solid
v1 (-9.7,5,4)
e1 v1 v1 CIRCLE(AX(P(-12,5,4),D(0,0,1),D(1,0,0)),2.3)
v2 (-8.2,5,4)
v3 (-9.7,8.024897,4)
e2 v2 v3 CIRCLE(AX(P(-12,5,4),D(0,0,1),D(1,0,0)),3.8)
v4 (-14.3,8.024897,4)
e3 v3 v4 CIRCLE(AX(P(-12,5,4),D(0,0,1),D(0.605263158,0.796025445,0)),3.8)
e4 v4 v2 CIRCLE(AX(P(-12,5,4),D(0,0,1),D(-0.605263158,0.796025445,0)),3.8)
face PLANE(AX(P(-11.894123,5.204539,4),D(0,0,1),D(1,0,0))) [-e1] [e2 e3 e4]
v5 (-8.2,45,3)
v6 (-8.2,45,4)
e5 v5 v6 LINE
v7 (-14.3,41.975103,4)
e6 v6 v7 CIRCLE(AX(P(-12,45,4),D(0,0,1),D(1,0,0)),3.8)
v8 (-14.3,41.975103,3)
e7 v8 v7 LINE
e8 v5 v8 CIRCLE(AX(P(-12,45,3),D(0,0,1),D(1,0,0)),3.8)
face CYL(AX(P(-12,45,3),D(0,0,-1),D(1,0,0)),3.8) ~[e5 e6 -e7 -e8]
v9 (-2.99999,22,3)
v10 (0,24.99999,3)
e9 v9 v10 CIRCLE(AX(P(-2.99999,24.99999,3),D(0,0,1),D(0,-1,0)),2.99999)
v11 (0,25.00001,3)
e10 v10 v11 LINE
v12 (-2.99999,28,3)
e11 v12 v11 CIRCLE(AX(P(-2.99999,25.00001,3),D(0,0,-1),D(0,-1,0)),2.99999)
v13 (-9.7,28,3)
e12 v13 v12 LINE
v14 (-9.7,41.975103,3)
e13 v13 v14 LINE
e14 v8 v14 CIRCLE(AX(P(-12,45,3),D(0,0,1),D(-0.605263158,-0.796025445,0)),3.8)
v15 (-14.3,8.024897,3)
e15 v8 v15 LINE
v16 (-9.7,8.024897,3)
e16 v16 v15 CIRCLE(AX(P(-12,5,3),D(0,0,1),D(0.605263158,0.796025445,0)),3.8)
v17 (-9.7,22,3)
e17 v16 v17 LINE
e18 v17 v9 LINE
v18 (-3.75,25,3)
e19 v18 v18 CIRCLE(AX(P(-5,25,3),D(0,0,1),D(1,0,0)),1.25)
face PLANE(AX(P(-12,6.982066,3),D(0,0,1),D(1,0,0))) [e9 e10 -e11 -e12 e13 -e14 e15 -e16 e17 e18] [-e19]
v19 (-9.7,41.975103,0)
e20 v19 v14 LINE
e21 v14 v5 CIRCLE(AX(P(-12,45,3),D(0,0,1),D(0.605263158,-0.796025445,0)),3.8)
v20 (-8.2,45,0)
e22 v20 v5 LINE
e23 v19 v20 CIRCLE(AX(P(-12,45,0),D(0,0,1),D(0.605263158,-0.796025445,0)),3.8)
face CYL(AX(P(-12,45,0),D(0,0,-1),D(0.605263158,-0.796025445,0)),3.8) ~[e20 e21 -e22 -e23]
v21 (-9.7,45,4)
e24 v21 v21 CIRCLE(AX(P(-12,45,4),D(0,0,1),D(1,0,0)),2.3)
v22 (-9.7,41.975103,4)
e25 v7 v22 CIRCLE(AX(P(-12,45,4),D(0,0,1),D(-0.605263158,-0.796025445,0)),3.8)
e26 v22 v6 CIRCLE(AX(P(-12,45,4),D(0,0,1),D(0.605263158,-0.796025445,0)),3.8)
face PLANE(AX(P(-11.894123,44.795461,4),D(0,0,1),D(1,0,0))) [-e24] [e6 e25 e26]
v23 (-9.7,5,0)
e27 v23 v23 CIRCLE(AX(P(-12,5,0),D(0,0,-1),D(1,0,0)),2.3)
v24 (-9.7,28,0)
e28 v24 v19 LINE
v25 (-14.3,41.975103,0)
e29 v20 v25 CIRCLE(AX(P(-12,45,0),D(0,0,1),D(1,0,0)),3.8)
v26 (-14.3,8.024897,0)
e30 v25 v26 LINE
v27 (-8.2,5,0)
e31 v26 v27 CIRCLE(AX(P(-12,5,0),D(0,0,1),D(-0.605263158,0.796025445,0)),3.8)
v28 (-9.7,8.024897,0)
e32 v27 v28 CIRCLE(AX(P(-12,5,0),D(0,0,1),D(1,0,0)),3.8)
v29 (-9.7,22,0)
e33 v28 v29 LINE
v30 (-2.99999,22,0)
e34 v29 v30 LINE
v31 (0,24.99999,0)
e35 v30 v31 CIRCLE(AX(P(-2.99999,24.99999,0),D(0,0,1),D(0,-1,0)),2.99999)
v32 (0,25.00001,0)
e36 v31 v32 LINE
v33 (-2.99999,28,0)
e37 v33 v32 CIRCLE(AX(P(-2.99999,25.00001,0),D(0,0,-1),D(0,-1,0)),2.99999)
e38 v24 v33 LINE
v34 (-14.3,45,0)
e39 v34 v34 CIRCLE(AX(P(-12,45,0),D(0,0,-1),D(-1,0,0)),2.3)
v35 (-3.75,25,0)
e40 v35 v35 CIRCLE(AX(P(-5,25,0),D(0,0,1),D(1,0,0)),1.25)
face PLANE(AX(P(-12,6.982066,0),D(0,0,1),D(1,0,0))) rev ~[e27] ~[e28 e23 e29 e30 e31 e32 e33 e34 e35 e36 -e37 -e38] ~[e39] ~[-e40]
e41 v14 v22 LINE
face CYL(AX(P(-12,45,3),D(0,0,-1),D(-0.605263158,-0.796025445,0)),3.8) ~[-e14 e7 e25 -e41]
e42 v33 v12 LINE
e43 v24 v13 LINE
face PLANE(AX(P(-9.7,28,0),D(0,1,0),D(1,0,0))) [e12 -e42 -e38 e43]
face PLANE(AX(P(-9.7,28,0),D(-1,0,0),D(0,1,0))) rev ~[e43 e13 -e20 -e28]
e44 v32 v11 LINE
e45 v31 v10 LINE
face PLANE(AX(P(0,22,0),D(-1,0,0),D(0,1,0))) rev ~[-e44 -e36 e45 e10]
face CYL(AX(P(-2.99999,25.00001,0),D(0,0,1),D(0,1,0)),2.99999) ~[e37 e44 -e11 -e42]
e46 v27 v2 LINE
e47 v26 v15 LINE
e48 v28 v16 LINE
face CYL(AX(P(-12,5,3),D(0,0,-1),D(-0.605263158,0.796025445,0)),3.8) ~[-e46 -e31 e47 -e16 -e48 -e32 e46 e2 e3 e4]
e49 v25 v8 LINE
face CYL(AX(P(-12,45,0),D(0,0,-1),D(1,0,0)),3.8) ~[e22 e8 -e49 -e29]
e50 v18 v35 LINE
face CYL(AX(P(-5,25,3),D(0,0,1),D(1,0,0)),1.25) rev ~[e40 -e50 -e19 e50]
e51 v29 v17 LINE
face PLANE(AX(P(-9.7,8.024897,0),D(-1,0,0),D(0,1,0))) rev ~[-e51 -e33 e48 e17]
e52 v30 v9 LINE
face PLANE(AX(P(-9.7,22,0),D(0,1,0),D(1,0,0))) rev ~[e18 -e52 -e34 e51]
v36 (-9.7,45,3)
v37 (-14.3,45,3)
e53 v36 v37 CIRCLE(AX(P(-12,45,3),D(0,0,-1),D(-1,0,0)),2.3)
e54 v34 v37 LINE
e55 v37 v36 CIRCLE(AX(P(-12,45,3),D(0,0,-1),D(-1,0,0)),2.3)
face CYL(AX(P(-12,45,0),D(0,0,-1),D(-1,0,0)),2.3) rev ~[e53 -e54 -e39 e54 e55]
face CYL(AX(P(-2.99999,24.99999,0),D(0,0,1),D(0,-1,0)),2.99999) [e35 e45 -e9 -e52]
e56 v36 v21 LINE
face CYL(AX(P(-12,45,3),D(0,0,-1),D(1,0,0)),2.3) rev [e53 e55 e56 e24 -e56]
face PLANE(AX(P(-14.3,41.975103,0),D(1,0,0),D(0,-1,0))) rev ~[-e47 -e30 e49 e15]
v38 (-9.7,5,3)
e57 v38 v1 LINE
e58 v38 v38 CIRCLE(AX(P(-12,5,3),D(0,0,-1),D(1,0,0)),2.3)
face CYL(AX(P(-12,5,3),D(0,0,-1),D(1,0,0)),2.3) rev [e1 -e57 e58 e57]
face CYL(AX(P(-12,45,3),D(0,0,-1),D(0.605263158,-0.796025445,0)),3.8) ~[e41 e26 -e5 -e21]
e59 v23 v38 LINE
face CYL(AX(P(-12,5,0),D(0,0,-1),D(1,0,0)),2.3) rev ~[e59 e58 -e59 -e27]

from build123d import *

# Parameters (mm, degrees)
F0_W     = 9.7
F0_H     = 6
F1_DEPTH = 3
F2_R     = 1.25
F3_DEPTH = 25
F4_R     = 2.99999
F5_R     = 2.3
F6_DEPTH = 1


# Not quite as in the source:
# - a fillet or chamfer is up to 0.001 mm smaller than in the source, because OpenCascade refuses the exact size
# - a feature names something its author has since deleted; it is built from what else it names


with BuildPart() as f1:
    # F0 (on Top) → F1 (new body)
    with BuildSketch(Plane.XY):
        with BuildLine():
            ThreePointArc((-14.3, 5), (-12, 7.3), (-9.7, 5))
            Line((-9.7, 5), (-9.7, 8.0248966925))
            ThreePointArc((-9.7, 8.0248966925), (-12, 8.8), (-14.3, 8.0248966925))
            Line((-14.3, 8.0248966925), (-14.3, 5))
        make_face()
        with BuildLine():
            Line((-9.7, 8.0248966925), (-9.7, 5))
            ThreePointArc((-9.7, 5), (-12, 2.7), (-14.3, 5))
            Line((-14.3, 5), (-14.3, 8.0248966925))
            ThreePointArc((-14.3, 8.0248966925), (-13.6881943016, 1.5955910939), (-8.2, 5))
            ThreePointArc((-8.2, 5), (-8.5955910939, 6.6881943016), (-9.7, 8.0248966925))
        make_face()
        with BuildLine():
            ThreePointArc((-8.2, 45), (-13.6881943016, 48.4044089061), (-14.3, 41.9751033075))
            Line((-14.3, 41.9751033075), (-14.3, 45))
            ThreePointArc((-14.3, 45), (-12, 47.3), (-9.7, 45))
            Line((-9.7, 45), (-9.7, 41.9751033075))
            ThreePointArc((-9.7, 41.9751033075), (-8.5955910939, 43.3118056984), (-8.2, 45))
        make_face()
        with BuildLine():
            Line((-14.3, 45), (-14.3, 41.9751033075))
            ThreePointArc((-14.3, 41.9751033075), (-12, 41.2), (-9.7, 41.9751033075))
            Line((-9.7, 41.9751033075), (-9.7, 45))
            ThreePointArc((-9.7, 45), (-12, 42.7), (-14.3, 45))
        make_face()
        with BuildLine():
            ThreePointArc((-14.3, 8.0248966925), (-12, 8.8), (-9.7, 8.0248966925))
            Line((-9.7, 8.0248966925), (-9.7, 22))
            Line((-9.7, 22), (-9.7, 28))
            Line((-9.7, 28), (-9.7, 41.9751033075))
            ThreePointArc((-9.7, 41.9751033075), (-12, 41.2), (-14.3, 41.9751033075))
            Line((-14.3, 41.9751033075), (-14.3, 8.0248966925))
        make_face()
        with Locations((-4.85, 25)):
            Rectangle(F0_W, F0_H)
        with BuildLine():
            ThreePointArc((-8.2, 45), (-13.6881943016, 48.4044089061), (-14.3, 41.9751033075))
            Line((-14.3, 41.9751033075), (-14.3, 45))
            ThreePointArc((-14.3, 45), (-12, 47.3), (-9.7, 45))
            Line((-9.7, 45), (-9.7, 41.9751033075))
            ThreePointArc((-9.7, 41.9751033075), (-8.5955910939, 43.3118056984), (-8.2, 45))
        make_face()
    extrude(amount=F1_DEPTH)

    # F2 (on face) → F3 (cut)
    with BuildSketch(Plane.XY.offset(3)):
        with Locations((-5, 25)):
            Circle(F2_R)
    extrude(amount=-F3_DEPTH, mode=Mode.SUBTRACT)

    # F4 (radius 3 in the source; OpenCascade refuses exactly that, so slightly less here)
    f4_edges = [f1.edges().sort_by_distance(p)[0] for p in [
        (0, 28, 1.5),
        (0, 22, 1.5),
    ]]
    fillet(f4_edges, radius=F4_R)

    # F5 (on face) → F6 (join)
    with BuildSketch(Plane.XY.offset(3)):
        with BuildLine():
            ThreePointArc((-14.3, 8.0248966925), (-13.6881943016, 1.5955910939), (-8.2, 5))
            ThreePointArc((-8.2, 5), (-8.5955910939, 6.6881943016), (-9.7, 8.0248966925))
            ThreePointArc((-9.7, 8.0248966925), (-12, 8.8), (-14.3, 8.0248966925))
        make_face()
        with Locations((-12, 5)):
            Circle(F5_R, mode=Mode.SUBTRACT)
        with BuildLine():
            ThreePointArc((-8.2, 45), (-13.6881943016, 48.4044089061), (-14.3, 41.9751033075))
            ThreePointArc((-14.3, 41.9751033075), (-12, 41.2), (-9.7, 41.9751033075))
            ThreePointArc((-9.7, 41.9751033075), (-8.5955910939, 43.3118056984), (-8.2, 45))
        make_face()
        with Locations((-12, 45)):
            Circle(F5_R, mode=Mode.SUBTRACT)
    extrude(amount=F6_DEPTH)


solid = f1.part
